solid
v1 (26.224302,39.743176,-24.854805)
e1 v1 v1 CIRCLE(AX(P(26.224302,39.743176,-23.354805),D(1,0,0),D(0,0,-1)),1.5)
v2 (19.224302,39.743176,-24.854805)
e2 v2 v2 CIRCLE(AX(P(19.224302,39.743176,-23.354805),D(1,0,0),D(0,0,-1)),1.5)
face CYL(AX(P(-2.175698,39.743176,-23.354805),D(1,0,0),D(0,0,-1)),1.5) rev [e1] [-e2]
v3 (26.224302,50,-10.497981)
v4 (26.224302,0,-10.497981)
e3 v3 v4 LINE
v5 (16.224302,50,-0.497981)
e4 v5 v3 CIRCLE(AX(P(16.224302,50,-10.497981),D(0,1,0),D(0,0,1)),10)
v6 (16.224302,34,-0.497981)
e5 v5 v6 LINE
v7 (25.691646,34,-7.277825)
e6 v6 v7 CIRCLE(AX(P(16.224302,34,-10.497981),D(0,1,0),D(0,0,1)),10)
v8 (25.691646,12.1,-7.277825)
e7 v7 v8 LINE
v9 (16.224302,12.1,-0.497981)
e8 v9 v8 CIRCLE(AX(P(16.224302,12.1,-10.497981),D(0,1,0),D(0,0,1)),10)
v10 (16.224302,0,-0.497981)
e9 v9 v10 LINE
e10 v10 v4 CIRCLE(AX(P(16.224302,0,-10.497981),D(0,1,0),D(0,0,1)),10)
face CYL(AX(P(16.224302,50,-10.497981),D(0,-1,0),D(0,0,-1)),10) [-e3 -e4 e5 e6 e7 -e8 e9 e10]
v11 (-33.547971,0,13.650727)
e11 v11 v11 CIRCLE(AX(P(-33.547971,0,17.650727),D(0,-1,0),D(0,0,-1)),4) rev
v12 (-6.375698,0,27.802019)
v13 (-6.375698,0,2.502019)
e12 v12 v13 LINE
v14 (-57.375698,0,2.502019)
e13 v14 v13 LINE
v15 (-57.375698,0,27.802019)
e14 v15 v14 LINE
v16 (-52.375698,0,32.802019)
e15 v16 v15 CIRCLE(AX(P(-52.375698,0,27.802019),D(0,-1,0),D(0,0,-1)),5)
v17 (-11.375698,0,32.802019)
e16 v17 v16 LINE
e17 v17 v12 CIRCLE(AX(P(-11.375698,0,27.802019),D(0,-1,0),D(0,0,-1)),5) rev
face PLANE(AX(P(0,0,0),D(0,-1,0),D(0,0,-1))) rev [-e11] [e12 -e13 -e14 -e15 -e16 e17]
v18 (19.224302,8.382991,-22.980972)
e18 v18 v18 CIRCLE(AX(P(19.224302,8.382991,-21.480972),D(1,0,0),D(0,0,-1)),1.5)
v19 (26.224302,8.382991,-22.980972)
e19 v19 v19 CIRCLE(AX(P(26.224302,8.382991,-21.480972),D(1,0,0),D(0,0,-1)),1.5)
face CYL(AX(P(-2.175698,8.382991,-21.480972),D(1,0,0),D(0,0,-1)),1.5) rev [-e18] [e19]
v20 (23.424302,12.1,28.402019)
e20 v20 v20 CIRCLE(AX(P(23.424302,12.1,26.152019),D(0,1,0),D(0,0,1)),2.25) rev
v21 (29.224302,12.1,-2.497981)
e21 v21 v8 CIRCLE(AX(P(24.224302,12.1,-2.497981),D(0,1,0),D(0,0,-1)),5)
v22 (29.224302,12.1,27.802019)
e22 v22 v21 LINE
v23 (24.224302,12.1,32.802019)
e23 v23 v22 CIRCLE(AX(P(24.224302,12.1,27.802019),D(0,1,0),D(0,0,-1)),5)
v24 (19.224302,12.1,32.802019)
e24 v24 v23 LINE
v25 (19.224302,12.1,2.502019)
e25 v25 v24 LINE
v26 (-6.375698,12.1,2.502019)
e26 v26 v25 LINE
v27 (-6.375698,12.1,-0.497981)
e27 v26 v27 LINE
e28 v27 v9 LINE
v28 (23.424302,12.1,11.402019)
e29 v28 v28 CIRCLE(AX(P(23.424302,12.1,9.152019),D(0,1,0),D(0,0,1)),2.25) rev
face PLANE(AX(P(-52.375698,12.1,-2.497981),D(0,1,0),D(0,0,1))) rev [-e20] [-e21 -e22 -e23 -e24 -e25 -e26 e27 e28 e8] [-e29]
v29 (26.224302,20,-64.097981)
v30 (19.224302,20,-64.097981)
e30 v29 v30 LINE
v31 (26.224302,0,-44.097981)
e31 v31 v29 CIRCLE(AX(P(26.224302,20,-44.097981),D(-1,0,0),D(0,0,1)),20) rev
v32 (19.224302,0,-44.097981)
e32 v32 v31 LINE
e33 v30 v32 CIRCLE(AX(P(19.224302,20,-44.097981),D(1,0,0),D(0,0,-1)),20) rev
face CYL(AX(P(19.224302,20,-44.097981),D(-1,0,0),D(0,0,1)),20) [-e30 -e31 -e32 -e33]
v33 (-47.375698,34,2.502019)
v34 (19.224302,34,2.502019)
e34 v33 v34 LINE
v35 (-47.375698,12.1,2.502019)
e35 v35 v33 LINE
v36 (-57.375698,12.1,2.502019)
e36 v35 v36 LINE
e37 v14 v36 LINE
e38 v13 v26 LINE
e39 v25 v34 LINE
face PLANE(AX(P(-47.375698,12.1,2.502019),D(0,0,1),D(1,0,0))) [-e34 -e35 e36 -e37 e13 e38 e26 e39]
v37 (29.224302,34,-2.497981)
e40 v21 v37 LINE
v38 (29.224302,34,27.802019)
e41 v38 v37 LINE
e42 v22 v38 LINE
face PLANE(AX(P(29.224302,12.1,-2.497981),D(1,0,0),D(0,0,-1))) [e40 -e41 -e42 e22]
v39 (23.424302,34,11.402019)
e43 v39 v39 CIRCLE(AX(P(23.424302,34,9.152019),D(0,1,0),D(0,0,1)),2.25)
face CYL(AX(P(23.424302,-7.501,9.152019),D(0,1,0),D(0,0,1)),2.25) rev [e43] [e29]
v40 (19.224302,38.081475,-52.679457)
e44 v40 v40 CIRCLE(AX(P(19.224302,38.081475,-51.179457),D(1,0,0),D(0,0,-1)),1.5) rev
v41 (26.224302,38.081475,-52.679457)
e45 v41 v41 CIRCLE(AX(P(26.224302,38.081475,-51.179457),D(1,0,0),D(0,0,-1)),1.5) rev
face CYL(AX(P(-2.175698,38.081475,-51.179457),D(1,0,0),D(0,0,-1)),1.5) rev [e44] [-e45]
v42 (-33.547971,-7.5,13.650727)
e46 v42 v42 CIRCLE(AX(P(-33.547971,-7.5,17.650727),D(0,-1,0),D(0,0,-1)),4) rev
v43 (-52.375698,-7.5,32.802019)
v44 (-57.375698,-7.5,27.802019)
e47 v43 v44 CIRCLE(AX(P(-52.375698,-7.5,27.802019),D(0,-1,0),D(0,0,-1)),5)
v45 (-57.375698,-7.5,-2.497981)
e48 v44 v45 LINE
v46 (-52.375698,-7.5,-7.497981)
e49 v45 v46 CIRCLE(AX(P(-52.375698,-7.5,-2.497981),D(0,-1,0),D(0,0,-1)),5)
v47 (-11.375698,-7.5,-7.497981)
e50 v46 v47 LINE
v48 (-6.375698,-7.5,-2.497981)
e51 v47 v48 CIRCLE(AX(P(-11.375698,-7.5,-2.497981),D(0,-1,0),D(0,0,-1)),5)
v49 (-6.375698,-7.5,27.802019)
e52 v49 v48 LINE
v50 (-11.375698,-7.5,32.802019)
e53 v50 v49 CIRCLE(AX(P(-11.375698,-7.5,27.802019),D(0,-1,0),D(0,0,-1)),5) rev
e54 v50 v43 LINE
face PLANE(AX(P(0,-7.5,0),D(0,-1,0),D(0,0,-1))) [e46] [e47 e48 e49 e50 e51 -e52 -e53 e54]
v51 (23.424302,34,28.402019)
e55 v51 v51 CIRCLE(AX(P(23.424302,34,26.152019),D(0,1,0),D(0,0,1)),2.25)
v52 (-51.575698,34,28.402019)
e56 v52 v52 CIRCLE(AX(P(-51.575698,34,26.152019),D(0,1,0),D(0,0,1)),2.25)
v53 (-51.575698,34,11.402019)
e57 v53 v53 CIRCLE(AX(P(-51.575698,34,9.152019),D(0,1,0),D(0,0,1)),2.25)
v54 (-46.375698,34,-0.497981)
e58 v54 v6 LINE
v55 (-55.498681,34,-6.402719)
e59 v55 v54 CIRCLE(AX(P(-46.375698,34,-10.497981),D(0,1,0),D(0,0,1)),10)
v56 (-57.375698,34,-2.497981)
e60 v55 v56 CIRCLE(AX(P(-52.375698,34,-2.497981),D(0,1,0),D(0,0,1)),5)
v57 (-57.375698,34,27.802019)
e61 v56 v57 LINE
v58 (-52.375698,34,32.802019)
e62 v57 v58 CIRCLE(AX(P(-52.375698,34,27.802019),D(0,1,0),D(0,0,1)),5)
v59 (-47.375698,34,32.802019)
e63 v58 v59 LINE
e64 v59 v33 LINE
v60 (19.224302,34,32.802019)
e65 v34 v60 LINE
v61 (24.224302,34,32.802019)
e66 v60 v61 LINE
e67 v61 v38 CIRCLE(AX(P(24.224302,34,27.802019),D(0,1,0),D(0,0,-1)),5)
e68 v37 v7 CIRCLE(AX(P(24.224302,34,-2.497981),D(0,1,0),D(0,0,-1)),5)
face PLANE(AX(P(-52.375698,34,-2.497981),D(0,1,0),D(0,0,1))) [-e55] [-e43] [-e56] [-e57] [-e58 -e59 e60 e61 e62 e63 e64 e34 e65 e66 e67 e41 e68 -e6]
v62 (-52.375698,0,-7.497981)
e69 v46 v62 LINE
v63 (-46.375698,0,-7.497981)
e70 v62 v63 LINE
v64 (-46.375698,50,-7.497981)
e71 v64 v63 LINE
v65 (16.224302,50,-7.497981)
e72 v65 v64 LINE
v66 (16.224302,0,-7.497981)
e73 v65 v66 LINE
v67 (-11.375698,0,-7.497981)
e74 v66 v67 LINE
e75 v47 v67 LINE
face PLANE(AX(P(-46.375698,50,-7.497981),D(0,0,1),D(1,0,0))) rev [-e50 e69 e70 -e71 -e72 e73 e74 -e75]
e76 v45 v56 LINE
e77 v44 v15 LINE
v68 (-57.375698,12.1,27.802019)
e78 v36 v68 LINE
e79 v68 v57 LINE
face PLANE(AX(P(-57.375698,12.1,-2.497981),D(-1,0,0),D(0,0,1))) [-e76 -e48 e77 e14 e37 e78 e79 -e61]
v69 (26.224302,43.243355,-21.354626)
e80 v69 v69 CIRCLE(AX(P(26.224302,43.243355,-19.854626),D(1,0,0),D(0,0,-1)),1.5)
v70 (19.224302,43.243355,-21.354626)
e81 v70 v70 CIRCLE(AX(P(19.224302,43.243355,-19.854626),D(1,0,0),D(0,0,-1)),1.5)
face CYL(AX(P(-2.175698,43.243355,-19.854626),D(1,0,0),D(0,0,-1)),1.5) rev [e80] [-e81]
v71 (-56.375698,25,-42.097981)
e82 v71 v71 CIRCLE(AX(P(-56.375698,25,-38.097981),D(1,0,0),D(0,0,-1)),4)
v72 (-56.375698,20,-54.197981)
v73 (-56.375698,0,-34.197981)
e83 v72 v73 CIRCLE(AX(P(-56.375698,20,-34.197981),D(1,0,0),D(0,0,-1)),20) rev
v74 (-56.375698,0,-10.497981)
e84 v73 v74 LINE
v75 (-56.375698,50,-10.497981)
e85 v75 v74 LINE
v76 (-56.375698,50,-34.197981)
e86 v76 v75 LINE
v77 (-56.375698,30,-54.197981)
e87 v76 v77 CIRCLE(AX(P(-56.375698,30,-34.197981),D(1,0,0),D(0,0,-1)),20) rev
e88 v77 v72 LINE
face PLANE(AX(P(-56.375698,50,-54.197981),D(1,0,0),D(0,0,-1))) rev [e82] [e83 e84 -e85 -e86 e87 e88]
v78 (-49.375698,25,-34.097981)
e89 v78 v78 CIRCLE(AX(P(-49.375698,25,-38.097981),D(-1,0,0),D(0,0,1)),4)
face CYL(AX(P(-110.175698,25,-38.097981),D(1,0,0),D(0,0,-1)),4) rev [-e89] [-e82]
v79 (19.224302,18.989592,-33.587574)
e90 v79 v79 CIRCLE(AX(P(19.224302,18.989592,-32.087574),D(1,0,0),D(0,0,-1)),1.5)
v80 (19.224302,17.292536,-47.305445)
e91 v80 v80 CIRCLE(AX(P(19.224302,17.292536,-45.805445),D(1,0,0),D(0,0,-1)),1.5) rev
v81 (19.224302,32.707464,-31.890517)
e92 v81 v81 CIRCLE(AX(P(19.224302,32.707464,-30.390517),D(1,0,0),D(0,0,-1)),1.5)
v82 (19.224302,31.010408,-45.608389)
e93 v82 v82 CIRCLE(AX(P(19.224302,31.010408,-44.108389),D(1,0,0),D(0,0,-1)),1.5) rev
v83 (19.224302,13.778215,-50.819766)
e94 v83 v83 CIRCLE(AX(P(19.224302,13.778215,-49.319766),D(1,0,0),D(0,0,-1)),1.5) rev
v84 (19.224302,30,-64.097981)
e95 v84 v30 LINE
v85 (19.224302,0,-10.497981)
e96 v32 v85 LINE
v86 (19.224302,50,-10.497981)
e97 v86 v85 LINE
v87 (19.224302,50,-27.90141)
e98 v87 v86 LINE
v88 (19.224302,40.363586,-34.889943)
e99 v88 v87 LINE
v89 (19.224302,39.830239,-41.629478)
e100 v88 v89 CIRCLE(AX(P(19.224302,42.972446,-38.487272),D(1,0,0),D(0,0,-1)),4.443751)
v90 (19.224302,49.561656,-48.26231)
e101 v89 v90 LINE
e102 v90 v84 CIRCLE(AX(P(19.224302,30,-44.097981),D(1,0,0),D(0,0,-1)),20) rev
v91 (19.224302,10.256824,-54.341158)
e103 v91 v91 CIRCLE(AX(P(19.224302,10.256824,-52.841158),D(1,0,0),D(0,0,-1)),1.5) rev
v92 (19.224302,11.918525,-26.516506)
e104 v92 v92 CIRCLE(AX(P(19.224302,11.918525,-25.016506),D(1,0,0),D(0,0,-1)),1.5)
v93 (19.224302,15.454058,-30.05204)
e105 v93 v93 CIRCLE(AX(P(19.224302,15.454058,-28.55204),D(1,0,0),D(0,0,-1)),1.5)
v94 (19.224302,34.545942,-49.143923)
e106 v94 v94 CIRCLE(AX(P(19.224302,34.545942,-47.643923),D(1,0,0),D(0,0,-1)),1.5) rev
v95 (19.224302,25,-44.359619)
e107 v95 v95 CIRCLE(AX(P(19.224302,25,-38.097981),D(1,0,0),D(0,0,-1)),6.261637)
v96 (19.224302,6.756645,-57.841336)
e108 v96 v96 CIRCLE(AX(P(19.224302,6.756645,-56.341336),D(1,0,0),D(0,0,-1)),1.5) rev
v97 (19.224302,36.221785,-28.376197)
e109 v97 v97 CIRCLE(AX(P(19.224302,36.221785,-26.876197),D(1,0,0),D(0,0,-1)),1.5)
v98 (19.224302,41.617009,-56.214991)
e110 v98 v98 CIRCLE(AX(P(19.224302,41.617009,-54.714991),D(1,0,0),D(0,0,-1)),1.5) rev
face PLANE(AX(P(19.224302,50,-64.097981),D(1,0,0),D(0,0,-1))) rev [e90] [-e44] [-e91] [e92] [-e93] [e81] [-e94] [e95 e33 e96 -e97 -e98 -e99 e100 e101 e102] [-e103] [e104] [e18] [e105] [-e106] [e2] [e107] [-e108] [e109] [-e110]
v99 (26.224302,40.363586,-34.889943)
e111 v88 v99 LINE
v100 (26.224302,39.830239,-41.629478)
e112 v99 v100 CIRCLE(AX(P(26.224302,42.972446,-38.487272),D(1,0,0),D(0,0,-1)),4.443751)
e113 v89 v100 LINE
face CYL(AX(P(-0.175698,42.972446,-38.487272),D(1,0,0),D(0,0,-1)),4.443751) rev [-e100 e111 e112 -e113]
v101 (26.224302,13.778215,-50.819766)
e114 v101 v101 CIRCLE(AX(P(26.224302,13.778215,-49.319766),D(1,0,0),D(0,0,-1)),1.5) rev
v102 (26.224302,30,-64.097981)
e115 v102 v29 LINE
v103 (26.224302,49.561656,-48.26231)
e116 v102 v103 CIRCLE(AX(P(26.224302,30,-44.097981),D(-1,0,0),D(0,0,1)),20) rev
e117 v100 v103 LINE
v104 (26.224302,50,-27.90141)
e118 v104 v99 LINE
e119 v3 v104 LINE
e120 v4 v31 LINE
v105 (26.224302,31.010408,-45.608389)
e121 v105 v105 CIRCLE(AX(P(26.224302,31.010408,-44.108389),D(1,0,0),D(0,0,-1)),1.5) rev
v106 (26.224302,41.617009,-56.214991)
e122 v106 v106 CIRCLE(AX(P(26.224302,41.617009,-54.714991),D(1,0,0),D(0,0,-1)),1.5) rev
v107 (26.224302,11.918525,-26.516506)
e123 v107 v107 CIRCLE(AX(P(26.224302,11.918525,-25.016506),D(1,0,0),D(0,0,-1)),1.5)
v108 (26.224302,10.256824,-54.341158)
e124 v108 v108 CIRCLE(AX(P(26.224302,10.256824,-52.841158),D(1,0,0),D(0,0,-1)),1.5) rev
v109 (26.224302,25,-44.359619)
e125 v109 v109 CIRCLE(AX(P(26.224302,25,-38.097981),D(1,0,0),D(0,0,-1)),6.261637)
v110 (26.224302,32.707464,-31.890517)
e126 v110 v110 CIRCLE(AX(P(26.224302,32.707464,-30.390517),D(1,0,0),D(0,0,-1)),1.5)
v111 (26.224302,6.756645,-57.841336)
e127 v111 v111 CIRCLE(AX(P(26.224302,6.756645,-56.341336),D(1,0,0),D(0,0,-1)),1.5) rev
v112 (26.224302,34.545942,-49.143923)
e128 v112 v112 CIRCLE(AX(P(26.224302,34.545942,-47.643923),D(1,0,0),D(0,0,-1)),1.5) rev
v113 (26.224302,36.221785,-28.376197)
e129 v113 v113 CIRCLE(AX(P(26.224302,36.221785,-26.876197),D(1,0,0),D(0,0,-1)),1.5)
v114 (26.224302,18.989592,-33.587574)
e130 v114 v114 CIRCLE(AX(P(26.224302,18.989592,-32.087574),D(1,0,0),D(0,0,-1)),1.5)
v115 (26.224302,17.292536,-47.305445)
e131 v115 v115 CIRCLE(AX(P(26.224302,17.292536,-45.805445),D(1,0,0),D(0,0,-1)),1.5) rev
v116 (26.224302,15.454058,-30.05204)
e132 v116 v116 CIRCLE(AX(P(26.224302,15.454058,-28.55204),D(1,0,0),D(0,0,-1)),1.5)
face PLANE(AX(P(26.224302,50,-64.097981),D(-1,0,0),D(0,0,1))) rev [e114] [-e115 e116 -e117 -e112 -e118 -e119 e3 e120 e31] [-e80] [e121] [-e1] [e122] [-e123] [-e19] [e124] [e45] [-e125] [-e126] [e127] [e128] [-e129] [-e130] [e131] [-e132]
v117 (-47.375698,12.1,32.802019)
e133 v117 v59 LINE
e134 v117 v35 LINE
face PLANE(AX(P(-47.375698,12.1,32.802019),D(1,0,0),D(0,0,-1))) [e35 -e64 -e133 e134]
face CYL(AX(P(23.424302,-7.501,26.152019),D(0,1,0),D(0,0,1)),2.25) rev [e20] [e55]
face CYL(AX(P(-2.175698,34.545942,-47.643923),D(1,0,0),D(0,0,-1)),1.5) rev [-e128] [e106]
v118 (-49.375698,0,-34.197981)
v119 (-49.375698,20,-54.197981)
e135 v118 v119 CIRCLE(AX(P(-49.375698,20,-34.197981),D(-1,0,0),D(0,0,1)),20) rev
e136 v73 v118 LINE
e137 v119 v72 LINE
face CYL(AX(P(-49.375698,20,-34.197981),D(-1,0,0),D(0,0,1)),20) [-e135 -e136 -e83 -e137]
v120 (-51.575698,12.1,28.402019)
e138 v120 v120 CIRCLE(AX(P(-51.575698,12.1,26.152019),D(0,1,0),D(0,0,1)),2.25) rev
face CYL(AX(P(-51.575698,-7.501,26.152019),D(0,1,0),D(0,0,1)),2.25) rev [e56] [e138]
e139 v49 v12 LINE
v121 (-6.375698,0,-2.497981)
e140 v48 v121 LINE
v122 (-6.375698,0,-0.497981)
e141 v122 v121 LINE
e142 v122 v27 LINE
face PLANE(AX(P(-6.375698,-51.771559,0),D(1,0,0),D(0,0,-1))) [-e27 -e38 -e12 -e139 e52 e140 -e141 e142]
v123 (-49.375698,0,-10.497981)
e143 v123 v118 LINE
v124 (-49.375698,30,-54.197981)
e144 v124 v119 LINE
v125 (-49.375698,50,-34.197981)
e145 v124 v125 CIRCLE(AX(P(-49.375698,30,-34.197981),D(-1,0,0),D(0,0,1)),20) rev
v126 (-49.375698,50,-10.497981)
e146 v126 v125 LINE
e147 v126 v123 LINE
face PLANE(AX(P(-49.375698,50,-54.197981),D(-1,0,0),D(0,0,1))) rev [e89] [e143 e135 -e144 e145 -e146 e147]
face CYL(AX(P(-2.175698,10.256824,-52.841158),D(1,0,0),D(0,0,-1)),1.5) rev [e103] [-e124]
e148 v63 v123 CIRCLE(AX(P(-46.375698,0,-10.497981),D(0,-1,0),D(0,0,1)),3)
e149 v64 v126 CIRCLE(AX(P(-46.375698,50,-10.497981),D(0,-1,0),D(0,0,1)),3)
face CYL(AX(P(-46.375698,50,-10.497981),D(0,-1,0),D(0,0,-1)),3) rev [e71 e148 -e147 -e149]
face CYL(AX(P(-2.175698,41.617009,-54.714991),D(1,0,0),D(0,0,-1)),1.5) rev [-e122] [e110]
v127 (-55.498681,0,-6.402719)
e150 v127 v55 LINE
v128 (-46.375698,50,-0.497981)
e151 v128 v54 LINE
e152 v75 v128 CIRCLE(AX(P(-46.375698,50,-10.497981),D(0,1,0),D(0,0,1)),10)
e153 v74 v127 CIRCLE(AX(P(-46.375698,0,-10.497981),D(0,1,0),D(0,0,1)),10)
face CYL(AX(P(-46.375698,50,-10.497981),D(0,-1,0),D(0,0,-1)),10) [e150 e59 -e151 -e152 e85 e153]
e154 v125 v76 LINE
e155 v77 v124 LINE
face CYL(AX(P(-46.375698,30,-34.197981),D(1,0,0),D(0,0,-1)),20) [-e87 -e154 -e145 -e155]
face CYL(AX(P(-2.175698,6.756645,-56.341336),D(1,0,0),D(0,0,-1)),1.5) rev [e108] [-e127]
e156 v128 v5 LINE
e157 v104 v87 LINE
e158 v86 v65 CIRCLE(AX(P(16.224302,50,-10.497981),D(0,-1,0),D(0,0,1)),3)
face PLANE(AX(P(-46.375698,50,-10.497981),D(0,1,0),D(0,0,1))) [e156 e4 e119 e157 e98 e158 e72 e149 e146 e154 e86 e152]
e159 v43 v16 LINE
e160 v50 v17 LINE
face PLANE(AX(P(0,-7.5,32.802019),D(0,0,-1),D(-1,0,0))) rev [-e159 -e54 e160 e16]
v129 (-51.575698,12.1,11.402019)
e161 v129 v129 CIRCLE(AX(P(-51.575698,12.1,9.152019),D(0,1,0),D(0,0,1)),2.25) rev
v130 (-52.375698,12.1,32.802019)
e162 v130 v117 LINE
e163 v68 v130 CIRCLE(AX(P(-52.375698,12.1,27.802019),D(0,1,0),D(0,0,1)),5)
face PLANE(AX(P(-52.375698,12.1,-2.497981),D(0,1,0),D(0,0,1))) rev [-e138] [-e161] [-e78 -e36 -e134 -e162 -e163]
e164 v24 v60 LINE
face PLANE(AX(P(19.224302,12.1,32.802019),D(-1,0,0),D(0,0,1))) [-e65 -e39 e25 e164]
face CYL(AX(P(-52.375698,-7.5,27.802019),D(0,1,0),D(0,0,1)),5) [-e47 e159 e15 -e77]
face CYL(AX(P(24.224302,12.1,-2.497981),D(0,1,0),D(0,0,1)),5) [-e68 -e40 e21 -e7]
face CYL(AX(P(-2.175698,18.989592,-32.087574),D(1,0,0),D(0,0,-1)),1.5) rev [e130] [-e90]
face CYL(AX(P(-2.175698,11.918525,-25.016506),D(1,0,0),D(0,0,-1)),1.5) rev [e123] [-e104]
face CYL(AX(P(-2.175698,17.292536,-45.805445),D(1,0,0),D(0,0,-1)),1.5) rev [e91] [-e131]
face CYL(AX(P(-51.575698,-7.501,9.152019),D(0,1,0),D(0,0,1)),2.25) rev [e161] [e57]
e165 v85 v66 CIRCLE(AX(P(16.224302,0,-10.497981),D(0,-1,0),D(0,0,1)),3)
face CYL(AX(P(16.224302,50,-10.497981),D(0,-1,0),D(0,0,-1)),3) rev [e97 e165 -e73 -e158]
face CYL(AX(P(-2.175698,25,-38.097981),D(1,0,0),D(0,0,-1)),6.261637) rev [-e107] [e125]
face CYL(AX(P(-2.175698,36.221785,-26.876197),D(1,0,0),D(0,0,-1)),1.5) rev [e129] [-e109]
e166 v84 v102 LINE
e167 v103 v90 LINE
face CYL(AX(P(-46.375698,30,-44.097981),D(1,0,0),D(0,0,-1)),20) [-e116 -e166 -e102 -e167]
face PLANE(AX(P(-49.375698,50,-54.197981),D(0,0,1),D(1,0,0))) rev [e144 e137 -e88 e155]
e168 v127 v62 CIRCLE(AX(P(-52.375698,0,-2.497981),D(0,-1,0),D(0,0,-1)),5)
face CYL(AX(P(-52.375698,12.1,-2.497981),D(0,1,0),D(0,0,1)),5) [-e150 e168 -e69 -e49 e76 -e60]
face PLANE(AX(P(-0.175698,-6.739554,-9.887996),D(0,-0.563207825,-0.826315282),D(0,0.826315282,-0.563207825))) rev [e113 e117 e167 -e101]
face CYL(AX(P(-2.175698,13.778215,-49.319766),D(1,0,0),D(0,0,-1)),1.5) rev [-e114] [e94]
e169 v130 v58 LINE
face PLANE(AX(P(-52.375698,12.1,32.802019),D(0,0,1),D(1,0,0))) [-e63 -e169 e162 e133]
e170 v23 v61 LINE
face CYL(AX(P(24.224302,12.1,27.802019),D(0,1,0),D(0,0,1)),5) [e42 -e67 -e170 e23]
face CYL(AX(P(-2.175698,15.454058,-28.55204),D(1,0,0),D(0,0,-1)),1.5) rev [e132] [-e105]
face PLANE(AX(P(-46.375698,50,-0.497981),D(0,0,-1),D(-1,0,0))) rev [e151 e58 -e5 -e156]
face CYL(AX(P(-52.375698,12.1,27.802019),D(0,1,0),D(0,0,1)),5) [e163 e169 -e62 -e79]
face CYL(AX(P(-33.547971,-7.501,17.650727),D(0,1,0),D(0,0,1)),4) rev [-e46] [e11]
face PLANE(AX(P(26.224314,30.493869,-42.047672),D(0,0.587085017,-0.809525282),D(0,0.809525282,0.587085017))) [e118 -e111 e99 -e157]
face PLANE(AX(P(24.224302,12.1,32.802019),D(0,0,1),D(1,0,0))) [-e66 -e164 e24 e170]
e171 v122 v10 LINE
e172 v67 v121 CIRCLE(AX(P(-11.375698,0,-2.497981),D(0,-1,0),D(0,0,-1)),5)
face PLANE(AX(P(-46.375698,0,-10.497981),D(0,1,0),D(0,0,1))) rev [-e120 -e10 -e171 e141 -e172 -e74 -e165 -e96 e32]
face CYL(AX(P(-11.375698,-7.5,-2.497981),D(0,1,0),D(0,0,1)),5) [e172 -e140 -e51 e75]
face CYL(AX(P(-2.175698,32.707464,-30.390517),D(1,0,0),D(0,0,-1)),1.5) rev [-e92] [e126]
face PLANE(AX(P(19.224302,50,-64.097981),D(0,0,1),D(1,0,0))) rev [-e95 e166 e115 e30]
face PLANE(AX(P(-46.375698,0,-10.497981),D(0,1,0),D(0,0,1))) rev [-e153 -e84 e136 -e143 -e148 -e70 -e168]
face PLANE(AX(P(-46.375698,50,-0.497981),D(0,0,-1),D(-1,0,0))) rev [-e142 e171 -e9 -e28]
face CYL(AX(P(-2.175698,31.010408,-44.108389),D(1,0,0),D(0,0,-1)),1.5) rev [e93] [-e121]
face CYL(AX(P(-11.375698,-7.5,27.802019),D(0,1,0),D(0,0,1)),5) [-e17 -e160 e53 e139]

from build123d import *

# Parameters (mm, degrees)
BOSS_EXTRUDE1_DEPTH      = 50
FILLET2_R                = 20
SKETCH6_R                = 1.5
CUT_EXTRUDE2_DEPTH       = 28.4
CUT_EXTRUDE3_DEPTH       = 136.4
CUT_EXTRUDE4_DEPTH       = 116.893533958
CUT_EXTRUDE4_DEPTH_BACK  = 26.4
BOSS_EXTRUDE2_DEPTH      = 21.9
BOSS_EXTRUDE3_DEPTH      = 12.1
BOSS_EXTRUDE4_DEPTH      = 7.5
CUT_EXTRUDE5_START       = 12.1
CUT_EXTRUDE5_OUTLINE_R   = 2.25
CUT_EXTRUDE5_DEPTH       = 21.9
CUT_EXTRUDE5_START_2     = -7.5
CUT_EXTRUDE5_2_OUTLINE_R = 4
CUT_EXTRUDE5_2_DEPTH     = 7.5


# Read off the part's stored shape, not the designer's step: Cut-Extrude5
with BuildPart() as part:
    # Sketch1 → Boss-Extrude1 (new body)
    with BuildSketch(Plane(origin=(0, 0, 0), x_dir=(1, 0, 0), z_dir=(0, 1, 0))):
        with BuildLine():
            Line((-56.375697839, 54.197981352), (-56.375697839, 10.497981352))
            ThreePointArc((-56.375697839, 10.497981352), (-53.44676565, 3.42691354), (-46.375697839, 0.497981352))
            Line((-46.375697839, 0.497981352), (16.224302161, 0.497981352))
            ThreePointArc((16.224302161, 0.497981352), (23.295369973, 3.42691354), (26.224302161, 10.497981352))
            Line((26.224302161, 10.497981352), (26.224302161, 64.097981352))
            Line((26.224302161, 64.097981352), (19.224302161, 64.097981352))
            Line((19.224302161, 64.097981352), (19.224302161, 10.497981352))
            ThreePointArc((19.224302161, 10.497981352), (18.345622505, 8.376661008), (16.224302161, 7.497981352))
            Line((16.224302161, 7.497981352), (-46.375697839, 7.497981352))
            ThreePointArc((-46.375697839, 7.497981352), (-48.497018182, 8.376661008), (-49.375697839, 10.497981352))
            Line((-49.375697839, 10.497981352), (-49.375697839, 54.197981352))
            Line((-49.375697839, 54.197981352), (-56.375697839, 54.197981352))
        make_face()
    extrude(amount=BOSS_EXTRUDE1_DEPTH)

    # Fillet2
    fillet2_edges = [part.edges().sort_by_distance(p)[0] for p in [
        (22.724302161, 0, -64.097981352),
        (-52.875697839, 0, -54.197981352),
        (22.724302161, 50, -64.097981352),
        (-52.875697839, 50, -54.197981352),
    ]]
    fillet(fillet2_edges, radius=FILLET2_R)

    # Sketch6 → Cut-Extrude2 (cut)
    with BuildSketch(Plane(origin=(26.224302161, 0, 0), x_dir=(0, 0, -1), z_dir=(1, 0, 0))):
        with BuildLine():
            ThreePointArc((34.097981352, 25), (38.097981352, 21), (42.097981352, 25))
            Line((42.097981352, 25), (34.097981352, 25))
        make_face()
        with BuildLine():
            Line((34.097981352, 25), (42.097981352, 25))
            ThreePointArc((42.097981352, 25), (38.097981352, 29), (34.097981352, 25))
        make_face()
        with BuildLine():
            ThreePointArc((31.836343923, 25), (38.097981352, 18.738362572), (44.35961878, 25))
            Line((44.35961878, 25), (42.097981352, 25))
            ThreePointArc((42.097981352, 25), (38.097981352, 21), (34.097981352, 25))
            Line((34.097981352, 25), (31.836343923, 25))
        make_face()
        with BuildLine():
            Line((42.097981352, 25), (44.35961878, 25))
            ThreePointArc((44.35961878, 25), (38.097981352, 31.261637428), (31.836343923, 25))
            Line((31.836343923, 25), (34.097981352, 25))
            ThreePointArc((34.097981352, 25), (38.097981352, 29), (42.097981352, 25))
        make_face()
        with Locations((30.390517437, 32.707463915)):
            Circle(SKETCH6_R)
        with Locations((26.876196734, 36.221784617)):
            Circle(SKETCH6_R)
        with Locations((23.354804964, 39.743176388)):
            Circle(SKETCH6_R)
        with Locations((19.854626397, 43.243354955)):
            Circle(SKETCH6_R)
        with Locations((44.108388992, 31.01040764)):
            Circle(SKETCH6_R)
        with Locations((47.643922898, 34.545941546)):
            Circle(SKETCH6_R)
        with Locations((51.179456803, 38.081475452)):
            Circle(SKETCH6_R)
        with Locations((54.714990709, 41.617009358)):
            Circle(SKETCH6_R)
        with Locations((45.805445266, 17.292536085)):
            Circle(SKETCH6_R)
        with Locations((49.319765969, 13.778215383)):
            Circle(SKETCH6_R)
        with Locations((52.841157739, 10.256823612)):
            Circle(SKETCH6_R)
        with Locations((56.341336306, 6.756645045)):
            Circle(SKETCH6_R)
        with Locations((32.087573711, 18.98959236)):
            Circle(SKETCH6_R)
        with Locations((28.552039805, 15.454058454)):
            Circle(SKETCH6_R)
        with Locations((25.0165059, 11.918524548)):
            Circle(SKETCH6_R)
        with Locations((21.480971994, 8.382990642)):
            Circle(SKETCH6_R)
    extrude(amount=-CUT_EXTRUDE2_DEPTH, mode=Mode.SUBTRACT)

    # Sketch6<3> → Cut-Extrude3 (cut)
    with BuildSketch(Plane(origin=(26.224302161, 0, 0), x_dir=(0, 0, -1), z_dir=(1, 0, 0))):
        with BuildLine():
            ThreePointArc((34.097981352, 25), (38.097981352, 21), (42.097981352, 25))
            Line((42.097981352, 25), (34.097981352, 25))
        make_face()
        with BuildLine():
            Line((34.097981352, 25), (42.097981352, 25))
            ThreePointArc((42.097981352, 25), (38.097981352, 29), (34.097981352, 25))
        make_face()
    extrude(amount=-CUT_EXTRUDE3_DEPTH, mode=Mode.SUBTRACT)

    # Sketch7 → Cut-Extrude4 (cut, two sides: drawn at the far end of the back side and taken through both)
    with BuildSketch(Plane(origin=(26.224302161, 0, 0), x_dir=(0, 0, -1), z_dir=(1, 0, 0)).offset(-CUT_EXTRUDE4_DEPTH_BACK)):
        with BuildLine():
            Line((44.097981352, 50), (27.901409821, 50))
            Line((27.901409821, 50), (34.889942889, 40.363586132))
            ThreePointArc((34.889942889, 40.363586132), (38.136702541, 38.542544558), (41.629478365, 39.830239282))
            Line((41.629478365, 39.830239282), (48.26230961, 49.561655609))
            ThreePointArc((48.26230961, 49.561655609), (46.191648926, 49.890112018), (44.097981352, 50))
        make_face()
    extrude(amount=CUT_EXTRUDE4_DEPTH + CUT_EXTRUDE4_DEPTH_BACK, mode=Mode.SUBTRACT)

    # Sketch8 → Boss-Extrude2 (add)
    with BuildSketch(Plane(origin=(0, 34, 0), x_dir=(1, 0, 0), z_dir=(0, 1, 0))):
        with BuildLine():
            Line((-52.375697839, 7.497981352), (24.224302161, 7.497981352))
            ThreePointArc((24.224302161, 7.497981352), (27.759836067, 6.033515257), (29.224302161, 2.497981352))
            Line((29.224302161, 2.497981352), (29.224302161, -27.802018648))
            ThreePointArc((29.224302161, -27.802018648), (27.759836067, -31.337552554), (24.224302161, -32.802018648))
            Line((24.224302161, -32.802018648), (19.224302161, -32.802018648))
            Line((19.224302161, -32.802018648), (19.224302161, -2.502018648))
            Line((19.224302161, -2.502018648), (-47.375697839, -2.502018648))
            Line((-47.375697839, -2.502018648), (-47.375697839, -32.802018648))
            Line((-47.375697839, -32.802018648), (-52.375697839, -32.802018648))
            ThreePointArc((-52.375697839, -32.802018648), (-55.911231744, -31.337552554), (-57.375697839, -27.802018648))
            Line((-57.375697839, -27.802018648), (-57.375697839, 2.497981352))
            ThreePointArc((-57.375697839, 2.497981352), (-55.911231744, 6.033515257), (-52.375697839, 7.497981352))
        make_face()
    extrude(amount=-BOSS_EXTRUDE2_DEPTH)

    # Sketch9 → Boss-Extrude3 (add)
    with BuildSketch(Plane.XZ.offset(-12.1)):
        with BuildLine():
            Line((-6.375697839, 2.502018648), (-47.375697839, 2.502018648))
            Line((-47.375697839, 2.502018648), (-57.375697839, 2.502018648))
            Line((-57.375697839, 2.502018648), (-57.375697839, -2.497981352))
            ThreePointArc((-57.375697839, -2.497981352), (-56.882077579, -4.664208864), (-55.498681185, -6.402718861))
            ThreePointArc((-55.498681185, -6.402718861), (-51.809268262, -2.102964231), (-46.375697839, -0.497981352))
            Line((-46.375697839, -0.497981352), (-6.375697839, -0.497981352))
            Line((-6.375697839, -0.497981352), (-6.375697839, 2.502018648))
        make_face()
    extrude(amount=BOSS_EXTRUDE3_DEPTH)

    # Sketch10 → Boss-Extrude4 (add)
    with BuildSketch(Plane.XZ):
        with BuildLine():
            ThreePointArc((-6.375697839, 27.802018648), (-7.840163933, 31.337552554), (-11.375697839, 32.802018648))
            Line((-11.375697839, 32.802018648), (-52.375697839, 32.802018648))
            ThreePointArc((-52.375697839, 32.802018648), (-55.911231744, 31.337552554), (-57.375697839, 27.802018648))
            Line((-57.375697839, 27.802018648), (-57.375697839, -2.497981352))
            ThreePointArc((-57.375697839, -2.497981352), (-55.911231744, -6.033515257), (-52.375697839, -7.497981352))
            Line((-52.375697839, -7.497981352), (-11.375697839, -7.497981352))
            ThreePointArc((-11.375697839, -7.497981352), (-7.840163933, -6.033515257), (-6.375697839, -2.497981352))
            Line((-6.375697839, -2.497981352), (-6.375697839, 27.802018648))
        make_face()
    extrude(amount=BOSS_EXTRUDE4_DEPTH)

    # Cut-Extrude5 outline → Cut-Extrude5 (cut)
    with BuildSketch(Plane(origin=(0, 0, 0), x_dir=(1, 0, 0), z_dir=(0, 1, 0)).offset(CUT_EXTRUDE5_START)):
        with Locations((23.424302161, -26.152018648)):
            Circle(CUT_EXTRUDE5_OUTLINE_R)
        with Locations((23.424302161, -9.152018648)):
            Circle(CUT_EXTRUDE5_OUTLINE_R)
        with Locations((-51.575697839, -9.152018648)):
            Circle(CUT_EXTRUDE5_OUTLINE_R)
        with Locations((-51.575697839, -26.152018648)):
            Circle(CUT_EXTRUDE5_OUTLINE_R)
    extrude(amount=CUT_EXTRUDE5_DEPTH, mode=Mode.SUBTRACT)

    # Cut-Extrude5 2 outline → Cut-Extrude5 2 (cut)
    with BuildSketch(Plane(origin=(0, 0, 0), x_dir=(1, 0, 0), z_dir=(0, 1, 0)).offset(CUT_EXTRUDE5_START_2)):
        with Locations((-33.547970659, -17.65072745)):
            Circle(CUT_EXTRUDE5_2_OUTLINE_R)
    extrude(amount=CUT_EXTRUDE5_2_DEPTH, mode=Mode.SUBTRACT)


solid = part.part
